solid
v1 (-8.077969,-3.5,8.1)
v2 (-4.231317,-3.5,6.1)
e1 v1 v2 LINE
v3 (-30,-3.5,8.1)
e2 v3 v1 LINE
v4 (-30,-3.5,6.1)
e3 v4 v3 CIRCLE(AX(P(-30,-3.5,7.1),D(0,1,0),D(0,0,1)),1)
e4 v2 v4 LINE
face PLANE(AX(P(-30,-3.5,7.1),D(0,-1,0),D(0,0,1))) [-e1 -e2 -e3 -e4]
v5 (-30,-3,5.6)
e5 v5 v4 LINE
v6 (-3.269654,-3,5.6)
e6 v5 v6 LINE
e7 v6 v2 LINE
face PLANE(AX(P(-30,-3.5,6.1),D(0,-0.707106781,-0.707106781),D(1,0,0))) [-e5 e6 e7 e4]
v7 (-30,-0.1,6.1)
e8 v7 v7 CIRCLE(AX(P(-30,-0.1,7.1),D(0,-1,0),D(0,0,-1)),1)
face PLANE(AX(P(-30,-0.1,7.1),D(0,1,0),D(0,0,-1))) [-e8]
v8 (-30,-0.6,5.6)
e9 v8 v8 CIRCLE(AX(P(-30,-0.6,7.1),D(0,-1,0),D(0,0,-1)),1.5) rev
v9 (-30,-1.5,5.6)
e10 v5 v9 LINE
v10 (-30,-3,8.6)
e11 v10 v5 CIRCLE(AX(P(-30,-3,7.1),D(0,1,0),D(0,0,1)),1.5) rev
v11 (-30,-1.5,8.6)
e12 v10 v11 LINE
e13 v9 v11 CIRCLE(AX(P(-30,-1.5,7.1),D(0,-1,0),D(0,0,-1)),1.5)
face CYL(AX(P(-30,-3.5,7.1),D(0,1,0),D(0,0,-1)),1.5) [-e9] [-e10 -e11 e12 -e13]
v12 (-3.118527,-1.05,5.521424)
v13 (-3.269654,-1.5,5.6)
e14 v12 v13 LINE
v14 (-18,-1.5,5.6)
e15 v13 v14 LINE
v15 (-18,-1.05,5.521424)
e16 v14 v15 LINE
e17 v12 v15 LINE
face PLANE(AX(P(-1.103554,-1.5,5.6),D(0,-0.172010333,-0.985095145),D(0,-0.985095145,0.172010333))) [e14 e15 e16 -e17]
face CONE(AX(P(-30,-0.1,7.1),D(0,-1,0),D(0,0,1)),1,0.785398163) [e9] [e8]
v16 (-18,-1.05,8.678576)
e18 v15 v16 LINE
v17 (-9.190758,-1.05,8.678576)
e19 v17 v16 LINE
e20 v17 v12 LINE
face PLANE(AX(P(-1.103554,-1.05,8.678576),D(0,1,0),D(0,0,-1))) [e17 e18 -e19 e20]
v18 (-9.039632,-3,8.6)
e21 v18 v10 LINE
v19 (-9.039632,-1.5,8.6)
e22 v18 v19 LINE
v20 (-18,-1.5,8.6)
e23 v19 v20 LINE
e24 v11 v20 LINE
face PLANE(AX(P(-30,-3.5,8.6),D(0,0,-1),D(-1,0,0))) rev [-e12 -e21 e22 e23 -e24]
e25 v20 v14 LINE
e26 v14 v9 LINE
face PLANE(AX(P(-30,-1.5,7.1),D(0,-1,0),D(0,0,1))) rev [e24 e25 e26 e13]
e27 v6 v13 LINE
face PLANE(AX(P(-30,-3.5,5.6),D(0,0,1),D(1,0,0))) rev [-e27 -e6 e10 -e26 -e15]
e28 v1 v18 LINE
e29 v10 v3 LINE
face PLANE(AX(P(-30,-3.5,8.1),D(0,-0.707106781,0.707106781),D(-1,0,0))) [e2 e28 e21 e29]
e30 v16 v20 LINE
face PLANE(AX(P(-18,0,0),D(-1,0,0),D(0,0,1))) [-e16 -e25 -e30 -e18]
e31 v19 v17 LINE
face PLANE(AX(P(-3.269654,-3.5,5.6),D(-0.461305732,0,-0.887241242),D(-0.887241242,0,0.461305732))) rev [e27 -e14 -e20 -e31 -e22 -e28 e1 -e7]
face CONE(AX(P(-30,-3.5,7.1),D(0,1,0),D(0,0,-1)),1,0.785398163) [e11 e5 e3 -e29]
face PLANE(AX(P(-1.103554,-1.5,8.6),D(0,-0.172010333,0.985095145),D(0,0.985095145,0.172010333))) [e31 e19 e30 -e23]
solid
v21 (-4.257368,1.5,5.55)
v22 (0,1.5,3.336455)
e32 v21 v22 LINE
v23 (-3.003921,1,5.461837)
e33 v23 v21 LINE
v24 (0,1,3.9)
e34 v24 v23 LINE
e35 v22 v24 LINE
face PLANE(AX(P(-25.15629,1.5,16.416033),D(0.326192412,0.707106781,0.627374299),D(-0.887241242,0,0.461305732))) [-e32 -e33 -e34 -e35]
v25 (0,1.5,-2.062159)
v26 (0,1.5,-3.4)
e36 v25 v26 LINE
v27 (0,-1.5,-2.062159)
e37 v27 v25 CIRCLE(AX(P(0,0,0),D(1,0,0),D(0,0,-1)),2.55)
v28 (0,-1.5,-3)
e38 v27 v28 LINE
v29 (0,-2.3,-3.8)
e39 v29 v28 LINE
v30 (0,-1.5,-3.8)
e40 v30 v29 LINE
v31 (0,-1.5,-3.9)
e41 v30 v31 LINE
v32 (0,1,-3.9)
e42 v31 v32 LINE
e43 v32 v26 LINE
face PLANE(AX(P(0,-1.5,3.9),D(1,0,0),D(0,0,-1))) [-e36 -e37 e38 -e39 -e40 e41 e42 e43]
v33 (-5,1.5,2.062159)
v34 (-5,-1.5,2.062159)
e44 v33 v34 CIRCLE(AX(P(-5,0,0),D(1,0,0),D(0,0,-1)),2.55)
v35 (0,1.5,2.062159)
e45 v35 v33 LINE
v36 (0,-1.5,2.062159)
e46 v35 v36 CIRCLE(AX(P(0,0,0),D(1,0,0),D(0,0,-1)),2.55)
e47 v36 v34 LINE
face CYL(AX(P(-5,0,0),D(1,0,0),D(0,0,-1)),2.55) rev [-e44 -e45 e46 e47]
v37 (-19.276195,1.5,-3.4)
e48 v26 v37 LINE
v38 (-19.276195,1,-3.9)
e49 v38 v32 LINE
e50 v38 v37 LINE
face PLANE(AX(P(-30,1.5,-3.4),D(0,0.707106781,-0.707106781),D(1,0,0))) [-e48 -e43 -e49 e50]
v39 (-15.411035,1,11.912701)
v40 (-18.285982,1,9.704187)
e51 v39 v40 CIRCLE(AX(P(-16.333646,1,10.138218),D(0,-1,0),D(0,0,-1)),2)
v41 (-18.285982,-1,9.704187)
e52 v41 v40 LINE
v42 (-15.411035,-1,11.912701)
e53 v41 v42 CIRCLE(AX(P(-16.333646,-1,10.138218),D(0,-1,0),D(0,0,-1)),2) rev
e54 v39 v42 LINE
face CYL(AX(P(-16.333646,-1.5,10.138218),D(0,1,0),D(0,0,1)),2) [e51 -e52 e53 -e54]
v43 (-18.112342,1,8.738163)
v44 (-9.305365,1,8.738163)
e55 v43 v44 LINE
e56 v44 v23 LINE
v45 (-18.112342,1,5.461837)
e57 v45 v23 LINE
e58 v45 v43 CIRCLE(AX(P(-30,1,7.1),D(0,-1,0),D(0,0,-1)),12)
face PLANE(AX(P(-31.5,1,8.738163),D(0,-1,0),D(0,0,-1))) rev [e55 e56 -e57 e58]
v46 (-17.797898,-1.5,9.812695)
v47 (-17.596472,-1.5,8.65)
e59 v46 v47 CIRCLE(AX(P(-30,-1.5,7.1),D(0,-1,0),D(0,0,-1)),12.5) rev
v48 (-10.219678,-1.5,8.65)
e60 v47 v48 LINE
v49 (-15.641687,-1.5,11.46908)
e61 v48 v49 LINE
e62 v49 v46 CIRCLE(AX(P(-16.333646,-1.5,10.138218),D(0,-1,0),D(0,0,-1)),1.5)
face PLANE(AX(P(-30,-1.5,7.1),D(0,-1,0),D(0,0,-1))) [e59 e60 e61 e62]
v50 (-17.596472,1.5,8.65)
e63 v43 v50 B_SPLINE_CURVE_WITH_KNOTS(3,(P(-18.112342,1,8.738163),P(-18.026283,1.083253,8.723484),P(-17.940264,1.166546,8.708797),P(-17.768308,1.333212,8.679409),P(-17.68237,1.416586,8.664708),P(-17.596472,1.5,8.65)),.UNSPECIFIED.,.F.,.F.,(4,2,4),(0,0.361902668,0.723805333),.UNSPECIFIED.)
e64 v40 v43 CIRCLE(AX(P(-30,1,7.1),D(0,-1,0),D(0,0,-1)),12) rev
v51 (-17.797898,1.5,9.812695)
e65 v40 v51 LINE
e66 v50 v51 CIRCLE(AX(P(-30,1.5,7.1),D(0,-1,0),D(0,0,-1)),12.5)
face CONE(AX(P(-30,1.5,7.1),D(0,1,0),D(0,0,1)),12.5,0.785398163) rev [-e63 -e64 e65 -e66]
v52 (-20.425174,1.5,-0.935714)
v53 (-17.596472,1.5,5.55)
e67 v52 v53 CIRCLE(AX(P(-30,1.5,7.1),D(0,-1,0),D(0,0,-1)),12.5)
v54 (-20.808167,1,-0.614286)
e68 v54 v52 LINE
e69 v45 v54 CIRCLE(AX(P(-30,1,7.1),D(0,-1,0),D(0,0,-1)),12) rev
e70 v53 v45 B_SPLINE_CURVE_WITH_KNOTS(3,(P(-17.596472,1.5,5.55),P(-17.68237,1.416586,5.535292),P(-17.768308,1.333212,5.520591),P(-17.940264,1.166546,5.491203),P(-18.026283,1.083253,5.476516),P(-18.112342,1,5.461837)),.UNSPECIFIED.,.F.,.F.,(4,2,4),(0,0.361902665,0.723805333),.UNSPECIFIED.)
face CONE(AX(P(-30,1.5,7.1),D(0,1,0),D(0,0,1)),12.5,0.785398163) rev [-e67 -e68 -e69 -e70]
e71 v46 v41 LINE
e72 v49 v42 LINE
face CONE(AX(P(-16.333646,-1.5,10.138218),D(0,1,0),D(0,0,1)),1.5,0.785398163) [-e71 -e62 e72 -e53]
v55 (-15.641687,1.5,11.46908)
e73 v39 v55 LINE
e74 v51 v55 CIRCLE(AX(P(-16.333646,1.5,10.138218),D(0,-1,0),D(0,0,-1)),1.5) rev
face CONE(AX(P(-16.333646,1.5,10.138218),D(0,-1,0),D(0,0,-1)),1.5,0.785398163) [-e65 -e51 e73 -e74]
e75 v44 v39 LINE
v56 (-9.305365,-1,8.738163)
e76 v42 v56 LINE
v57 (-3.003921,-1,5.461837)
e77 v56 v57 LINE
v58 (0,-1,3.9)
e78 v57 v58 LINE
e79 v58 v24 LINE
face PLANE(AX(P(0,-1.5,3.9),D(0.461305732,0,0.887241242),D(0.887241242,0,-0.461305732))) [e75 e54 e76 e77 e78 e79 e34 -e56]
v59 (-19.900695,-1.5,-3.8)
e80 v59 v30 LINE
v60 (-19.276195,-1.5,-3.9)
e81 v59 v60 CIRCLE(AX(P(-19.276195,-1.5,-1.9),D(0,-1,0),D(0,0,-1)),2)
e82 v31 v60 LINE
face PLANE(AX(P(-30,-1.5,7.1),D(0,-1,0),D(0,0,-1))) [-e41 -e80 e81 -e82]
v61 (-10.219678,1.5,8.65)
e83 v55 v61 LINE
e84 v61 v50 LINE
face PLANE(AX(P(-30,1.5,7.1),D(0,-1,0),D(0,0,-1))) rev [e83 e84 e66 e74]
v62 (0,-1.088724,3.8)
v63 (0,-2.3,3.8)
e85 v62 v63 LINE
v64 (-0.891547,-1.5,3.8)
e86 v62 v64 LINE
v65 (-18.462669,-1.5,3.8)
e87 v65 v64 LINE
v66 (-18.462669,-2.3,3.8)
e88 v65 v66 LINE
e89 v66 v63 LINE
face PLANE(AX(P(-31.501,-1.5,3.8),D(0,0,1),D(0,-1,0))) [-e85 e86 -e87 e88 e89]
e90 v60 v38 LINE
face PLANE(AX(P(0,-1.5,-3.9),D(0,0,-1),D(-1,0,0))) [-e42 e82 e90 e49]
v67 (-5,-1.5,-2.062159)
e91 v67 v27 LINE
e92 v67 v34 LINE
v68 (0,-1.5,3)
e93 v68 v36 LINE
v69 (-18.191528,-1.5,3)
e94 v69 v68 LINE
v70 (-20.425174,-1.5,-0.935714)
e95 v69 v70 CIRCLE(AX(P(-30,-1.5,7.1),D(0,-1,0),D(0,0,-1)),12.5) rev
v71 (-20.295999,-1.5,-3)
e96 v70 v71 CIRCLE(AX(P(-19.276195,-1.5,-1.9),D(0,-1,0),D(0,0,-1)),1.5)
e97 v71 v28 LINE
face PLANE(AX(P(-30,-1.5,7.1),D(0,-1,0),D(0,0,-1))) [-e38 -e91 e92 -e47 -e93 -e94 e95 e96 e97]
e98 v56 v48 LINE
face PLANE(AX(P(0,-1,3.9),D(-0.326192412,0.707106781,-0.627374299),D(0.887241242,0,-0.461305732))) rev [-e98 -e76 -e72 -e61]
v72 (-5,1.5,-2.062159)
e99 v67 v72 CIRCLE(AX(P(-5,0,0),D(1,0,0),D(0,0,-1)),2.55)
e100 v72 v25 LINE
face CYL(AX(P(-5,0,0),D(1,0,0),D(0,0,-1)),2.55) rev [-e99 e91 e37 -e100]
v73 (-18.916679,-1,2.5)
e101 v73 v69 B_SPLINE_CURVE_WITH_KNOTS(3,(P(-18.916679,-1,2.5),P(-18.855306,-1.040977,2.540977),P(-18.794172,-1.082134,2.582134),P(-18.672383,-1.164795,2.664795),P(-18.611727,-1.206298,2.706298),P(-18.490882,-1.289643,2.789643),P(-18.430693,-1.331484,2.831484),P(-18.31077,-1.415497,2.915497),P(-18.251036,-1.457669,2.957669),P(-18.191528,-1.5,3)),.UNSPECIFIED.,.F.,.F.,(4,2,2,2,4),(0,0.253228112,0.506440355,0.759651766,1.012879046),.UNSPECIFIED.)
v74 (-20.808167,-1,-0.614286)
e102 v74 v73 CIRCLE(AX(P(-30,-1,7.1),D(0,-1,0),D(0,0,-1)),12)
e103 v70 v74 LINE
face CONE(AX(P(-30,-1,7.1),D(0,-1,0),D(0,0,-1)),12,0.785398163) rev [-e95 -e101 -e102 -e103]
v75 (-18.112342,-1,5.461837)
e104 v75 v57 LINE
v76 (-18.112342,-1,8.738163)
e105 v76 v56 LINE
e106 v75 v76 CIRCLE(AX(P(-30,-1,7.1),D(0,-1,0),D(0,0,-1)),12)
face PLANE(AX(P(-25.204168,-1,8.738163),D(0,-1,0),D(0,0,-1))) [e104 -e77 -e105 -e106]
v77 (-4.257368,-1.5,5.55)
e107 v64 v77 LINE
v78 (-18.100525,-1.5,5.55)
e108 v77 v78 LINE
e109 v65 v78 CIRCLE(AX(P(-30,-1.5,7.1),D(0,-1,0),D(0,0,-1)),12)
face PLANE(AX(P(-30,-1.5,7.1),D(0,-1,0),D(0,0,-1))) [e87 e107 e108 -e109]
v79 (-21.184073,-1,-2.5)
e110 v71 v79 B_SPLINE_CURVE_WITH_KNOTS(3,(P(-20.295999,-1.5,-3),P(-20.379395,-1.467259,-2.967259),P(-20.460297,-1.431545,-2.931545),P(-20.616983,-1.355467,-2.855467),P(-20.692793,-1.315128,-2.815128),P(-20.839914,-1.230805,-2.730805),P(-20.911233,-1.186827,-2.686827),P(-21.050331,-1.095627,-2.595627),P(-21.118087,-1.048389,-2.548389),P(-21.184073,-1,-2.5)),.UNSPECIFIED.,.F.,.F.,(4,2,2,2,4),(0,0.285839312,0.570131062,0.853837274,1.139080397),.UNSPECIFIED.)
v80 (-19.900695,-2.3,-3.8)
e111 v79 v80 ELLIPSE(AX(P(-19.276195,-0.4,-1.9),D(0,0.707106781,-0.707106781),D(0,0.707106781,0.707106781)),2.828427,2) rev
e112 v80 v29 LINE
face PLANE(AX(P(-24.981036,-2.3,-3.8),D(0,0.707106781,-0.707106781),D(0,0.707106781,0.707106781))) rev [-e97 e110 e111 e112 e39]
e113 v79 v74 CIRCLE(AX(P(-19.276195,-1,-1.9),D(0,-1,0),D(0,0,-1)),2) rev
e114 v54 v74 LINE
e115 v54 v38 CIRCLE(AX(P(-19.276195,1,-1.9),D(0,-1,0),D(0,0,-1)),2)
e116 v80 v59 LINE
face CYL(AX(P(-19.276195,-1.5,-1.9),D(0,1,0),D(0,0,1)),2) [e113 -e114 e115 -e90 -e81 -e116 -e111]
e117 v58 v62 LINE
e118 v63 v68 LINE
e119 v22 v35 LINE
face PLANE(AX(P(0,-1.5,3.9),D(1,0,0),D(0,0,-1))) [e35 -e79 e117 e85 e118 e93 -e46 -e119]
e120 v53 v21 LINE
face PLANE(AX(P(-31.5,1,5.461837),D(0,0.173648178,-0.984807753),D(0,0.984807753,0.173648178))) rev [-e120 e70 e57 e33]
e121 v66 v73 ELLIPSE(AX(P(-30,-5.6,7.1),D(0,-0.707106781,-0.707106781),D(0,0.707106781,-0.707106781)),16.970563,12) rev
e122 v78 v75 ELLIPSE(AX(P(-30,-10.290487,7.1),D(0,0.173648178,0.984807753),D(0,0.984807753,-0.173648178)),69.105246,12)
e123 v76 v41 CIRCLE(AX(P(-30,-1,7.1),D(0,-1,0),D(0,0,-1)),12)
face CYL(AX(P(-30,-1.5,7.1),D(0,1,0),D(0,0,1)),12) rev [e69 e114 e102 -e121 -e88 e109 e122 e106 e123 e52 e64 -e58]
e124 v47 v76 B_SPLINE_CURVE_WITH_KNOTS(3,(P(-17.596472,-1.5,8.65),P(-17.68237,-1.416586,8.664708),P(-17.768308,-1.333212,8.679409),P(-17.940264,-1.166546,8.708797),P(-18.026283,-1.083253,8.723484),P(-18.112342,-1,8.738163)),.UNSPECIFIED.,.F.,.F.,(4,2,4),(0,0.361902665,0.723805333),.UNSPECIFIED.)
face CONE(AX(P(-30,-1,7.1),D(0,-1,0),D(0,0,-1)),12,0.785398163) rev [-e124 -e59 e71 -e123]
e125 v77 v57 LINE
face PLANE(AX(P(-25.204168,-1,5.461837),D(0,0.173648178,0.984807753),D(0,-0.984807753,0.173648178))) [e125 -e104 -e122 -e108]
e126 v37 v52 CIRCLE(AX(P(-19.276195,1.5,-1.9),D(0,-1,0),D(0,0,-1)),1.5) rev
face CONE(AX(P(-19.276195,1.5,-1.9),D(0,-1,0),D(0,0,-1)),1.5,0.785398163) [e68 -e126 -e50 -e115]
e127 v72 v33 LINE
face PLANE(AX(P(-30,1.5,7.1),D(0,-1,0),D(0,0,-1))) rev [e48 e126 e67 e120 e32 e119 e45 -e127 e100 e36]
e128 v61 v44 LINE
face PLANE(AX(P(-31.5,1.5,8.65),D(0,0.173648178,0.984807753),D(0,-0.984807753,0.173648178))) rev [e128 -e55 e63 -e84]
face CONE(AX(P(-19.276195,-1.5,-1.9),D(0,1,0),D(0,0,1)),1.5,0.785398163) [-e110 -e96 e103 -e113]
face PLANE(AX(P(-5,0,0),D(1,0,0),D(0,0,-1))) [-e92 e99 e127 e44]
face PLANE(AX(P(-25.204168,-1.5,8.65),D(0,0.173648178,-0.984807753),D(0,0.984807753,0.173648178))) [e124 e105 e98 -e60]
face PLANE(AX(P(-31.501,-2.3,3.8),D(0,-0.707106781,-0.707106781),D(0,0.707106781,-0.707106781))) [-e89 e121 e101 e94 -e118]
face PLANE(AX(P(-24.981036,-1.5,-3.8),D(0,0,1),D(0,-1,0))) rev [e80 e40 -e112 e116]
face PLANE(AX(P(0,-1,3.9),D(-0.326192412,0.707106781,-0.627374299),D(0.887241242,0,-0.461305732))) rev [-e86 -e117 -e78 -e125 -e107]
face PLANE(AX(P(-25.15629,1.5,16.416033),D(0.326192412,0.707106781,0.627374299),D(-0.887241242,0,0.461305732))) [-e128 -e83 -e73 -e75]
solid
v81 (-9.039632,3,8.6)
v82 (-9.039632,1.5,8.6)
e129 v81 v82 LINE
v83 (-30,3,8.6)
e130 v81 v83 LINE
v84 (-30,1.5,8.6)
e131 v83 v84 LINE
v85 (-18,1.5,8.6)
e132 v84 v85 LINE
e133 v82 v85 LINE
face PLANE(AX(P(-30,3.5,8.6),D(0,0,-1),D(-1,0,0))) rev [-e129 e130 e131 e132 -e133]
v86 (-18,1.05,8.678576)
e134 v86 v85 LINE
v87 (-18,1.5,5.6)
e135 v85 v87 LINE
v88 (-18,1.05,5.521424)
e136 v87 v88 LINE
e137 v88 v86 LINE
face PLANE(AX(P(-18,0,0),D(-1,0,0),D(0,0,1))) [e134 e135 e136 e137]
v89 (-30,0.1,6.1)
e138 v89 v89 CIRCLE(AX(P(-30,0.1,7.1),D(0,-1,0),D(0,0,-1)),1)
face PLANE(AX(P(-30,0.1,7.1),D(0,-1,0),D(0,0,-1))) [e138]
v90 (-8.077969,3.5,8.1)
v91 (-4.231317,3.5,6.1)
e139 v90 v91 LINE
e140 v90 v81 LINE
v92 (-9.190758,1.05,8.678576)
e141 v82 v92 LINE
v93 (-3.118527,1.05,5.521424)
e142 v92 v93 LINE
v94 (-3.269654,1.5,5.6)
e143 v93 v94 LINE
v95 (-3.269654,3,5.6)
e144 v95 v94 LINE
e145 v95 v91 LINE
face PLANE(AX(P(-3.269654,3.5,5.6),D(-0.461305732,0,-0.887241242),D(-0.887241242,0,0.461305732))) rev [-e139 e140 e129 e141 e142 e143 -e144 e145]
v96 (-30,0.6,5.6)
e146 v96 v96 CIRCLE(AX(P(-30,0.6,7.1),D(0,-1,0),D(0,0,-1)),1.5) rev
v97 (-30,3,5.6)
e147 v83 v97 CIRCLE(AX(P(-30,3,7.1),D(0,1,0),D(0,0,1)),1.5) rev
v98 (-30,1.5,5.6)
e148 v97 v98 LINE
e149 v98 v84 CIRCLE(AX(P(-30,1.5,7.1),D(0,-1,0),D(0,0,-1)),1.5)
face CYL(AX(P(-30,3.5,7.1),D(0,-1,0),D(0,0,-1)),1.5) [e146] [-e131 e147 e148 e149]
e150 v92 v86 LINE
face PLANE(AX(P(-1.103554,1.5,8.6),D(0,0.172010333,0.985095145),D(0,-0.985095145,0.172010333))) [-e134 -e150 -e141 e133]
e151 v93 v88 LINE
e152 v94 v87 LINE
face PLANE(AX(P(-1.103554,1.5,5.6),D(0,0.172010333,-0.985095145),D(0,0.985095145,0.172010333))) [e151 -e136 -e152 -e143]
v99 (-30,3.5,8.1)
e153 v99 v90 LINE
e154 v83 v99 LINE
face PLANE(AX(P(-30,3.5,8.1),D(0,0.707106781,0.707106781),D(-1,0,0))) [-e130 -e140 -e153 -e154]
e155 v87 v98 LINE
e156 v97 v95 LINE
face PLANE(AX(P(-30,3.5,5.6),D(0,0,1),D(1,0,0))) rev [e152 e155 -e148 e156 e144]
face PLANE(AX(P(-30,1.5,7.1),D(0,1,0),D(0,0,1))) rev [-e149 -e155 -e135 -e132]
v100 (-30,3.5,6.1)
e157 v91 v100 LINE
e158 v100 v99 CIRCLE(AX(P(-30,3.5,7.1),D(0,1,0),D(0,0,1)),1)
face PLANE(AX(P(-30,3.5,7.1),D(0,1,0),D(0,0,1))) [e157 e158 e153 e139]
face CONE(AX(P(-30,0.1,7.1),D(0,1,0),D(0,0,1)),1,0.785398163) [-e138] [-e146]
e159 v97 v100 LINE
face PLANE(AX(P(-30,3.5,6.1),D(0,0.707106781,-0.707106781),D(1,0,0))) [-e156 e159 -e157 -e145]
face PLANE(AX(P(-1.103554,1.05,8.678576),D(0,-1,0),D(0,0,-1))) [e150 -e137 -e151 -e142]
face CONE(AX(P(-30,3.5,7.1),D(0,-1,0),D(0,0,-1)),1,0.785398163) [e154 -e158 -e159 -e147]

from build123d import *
from build123d.topology import SkipClean

# Parameters (mm, degrees)
BOSS_EXTRUDE1_DEPTH      = 1.5
SKETCH3_R                = 2.5500000000000003
CUT_EXTRUDE1_DEPTH       = 5
BOSS_EXTRUDE2_DEPTH      = 2
CUT_EXTRUDE2_DEPTH       = 35.91480579173508
BOSS_EXTRUDE4_REACH      = 25.469
SKETCH8_R                = 1.499999999999997
BOSS_EXTRUDE5_DEPTH      = 1.4
FILLET1_R                = 2
BOSS_EXTRUDE6_REACH      = 35.939
BOSS_EXTRUDE6_END_RADIUS = 12
MIRROR2_START            = -24.981035963
MIRROR2_DEPTH            = 24.981035963
MIRROR2_START_2          = -3
MIRROR2_2_DEPTH          = 1.5
CUT_EXTRUDE4_DEPTH       = 35.12603615991723
CHAMFER2_SIZE            = 0.5
CHAMFER1_SIZE            = 0.5


with BuildPart() as part:
    # Sketch2 → Boss-Extrude1 (new, symmetric)
    with BuildSketch(Plane(origin=(0, 0, 0), x_dir=(1, 0, 0), z_dir=(0, 1, 0))):
        with BuildLine():
            Line((0, -3.9000000000000075), (0, 3.899999999999993))
            Line((0, 3.899999999999993), (-25.204168476687265, 3.899999999999991))
            ThreePointArc((-25.204168476687265, 3.899999999999991), (-18.343183564475204, -4.250678924992998), (-20.67057742658785, -14.647309086469686))
            Line((-20.67057742658785, -14.647309086469686), (0, -3.9000000000000075))
        make_face()
    extrude(amount=BOSS_EXTRUDE1_DEPTH, both=True)

    # Sketch3 → Cut-Extrude1 (cut)
    with BuildSketch(Plane(origin=(0, 0, 0), x_dir=(0, 0, -1), z_dir=(1, 0, 0))):
        Circle(SKETCH3_R)
    extrude(amount=-CUT_EXTRUDE1_DEPTH, mode=Mode.SUBTRACT)

    # Sketch5 → Cut-Extrude2 (cut, through all)
    with BuildSketch(Plane(origin=(0, 0, 0), x_dir=(0, 0, -1), z_dir=(1, 0, 0))):
        Polygon((-8.650000000000004, 1.5), (-8.73816349035424, 0.9999999999999993), (-5.461836509645769, 0.9999999999999993), (-5.550000000000004, 1.5), align=None)
    cut_extrude2 = extrude(amount=-CUT_EXTRUDE2_DEPTH, mode=Mode.SUBTRACT)

    # Mirror1: Cut-Extrude2 across plane
    add(cut_extrude2.mirror(Plane.ZX), mode=Mode.SUBTRACT)

    # Fillet1
    fillet1_edges = [part.edges().sort_by_distance(p)[0] for p in [
        (-20.67057742658785, 0, 14.647309086469686),
        (-25.204168476687265, 0, -3.8999999999999906),
    ]]
    fillet(fillet1_edges, radius=FILLET1_R)

    # Boss-Extrude6: up to this cylinder (the profile starts outside it)
    boss_extrude6_end = Plane(origin=(-30, -1.766667, 7.100000000000005), z_dir=(0, 1, 0)) * Cylinder(BOSS_EXTRUDE6_END_RADIUS, 96.878, mode=Mode.PRIVATE)
    # Sketch9 → Boss-Extrude6 (add, up to the surface)
    with BuildSketch(Plane(origin=(0, 0, 0), x_dir=(0, 0, -1), z_dir=(1, 0, 0)), mode=Mode.PRIVATE) as boss_extrude6_sk1:
        Polygon((-3.7999999999999994, -1.5), (-3.8, -2.3), (-3, -1.5), align=None)
    boss_extrude6_tool1 = extrude(boss_extrude6_sk1.sketch, amount=-BOSS_EXTRUDE6_REACH, mode=Mode.PRIVATE) - boss_extrude6_end
    add(boss_extrude6_tool1.solids().sort_by_distance((0, -1.766667, 3.533333))[0])

    # Mirror2: read off the stored shape, not the designer's step
    # Mirror2 outline → Mirror2 (add)
    with BuildSketch(Plane.YZ.offset(MIRROR2_START)):
        Polygon((-1.5, -3.8), (-1.5, -3), (-2.3, -3.8), align=None)
    extrude(amount=MIRROR2_DEPTH)

    # Mirror2 2 outline → Mirror2 2 (cut)
    with BuildSketch(Plane(origin=(0, 0, 0), x_dir=(1, 0, 0), z_dir=(0, 1, 0)).offset(MIRROR2_START_2)):
        with BuildLine():
            Line((-22, 2.024776923), (-23.520030864, 3))
            ThreePointArc((-23.520030864, 3), (-24.236635876, 3.425380467), (-24.981035963, 3.8))
            Line((-24.981035963, 3.8), (-24.981035963, 1))
            Line((-24.981035963, 1), (-22, 1))
            Line((-22, 1), (-22, 2.024776923))
        make_face()
    extrude(amount=MIRROR2_2_DEPTH, mode=Mode.SUBTRACT)

    # Sketch10 → Cut-Extrude4 (cut, through all)
    with BuildSketch(Plane(origin=(0, -1.5, 0), x_dir=(1, 0, 0), z_dir=(0, 1, 0))):
        with BuildLine():
            Line((-19.900694505076203, 3.799999999999999), (-24.98103596346817, 3.8000000000000003))
            ThreePointArc((-24.98103596346817, 3.8000000000000003), (-24.2366358760677, 3.4253804669935803), (-23.520030864271043, 3))
            Line((-23.520030864271043, 3), (-20.946524014085387, 3))
            ThreePointArc((-20.946524014085387, 3), (-20.491332623137634, 3.488533865071372), (-19.900694505076203, 3.799999999999999))
        make_face()
    extrude(amount=-CUT_EXTRUDE4_DEPTH, mode=Mode.SUBTRACT)

    # Chamfer1
    chamfer1_edges = [part.edges().sort_by_distance(p)[0] for p in [
        (-1.5867438295232468, 1.5, 4.725000000000003),
        (-9.638097352618193, 1.5, -3.899999999999992),
        (-21.088848639586317, 1.5, -2.745154254728507),
        (-19.01317053469328, 1.5, 2.2740722860502682),
        (-18.181494014390573, 1.5, 9.17916239580129),
        (-17.552032906206957, 1.5, 11.724261681549507),
        (-12.27341621121789, 1.5, 10.281350401908949),
        (-21.27283986088827, -1.5, -1.784206552811166),
        (-19.606839169271502, -1.5, 1.1014828543538435),
        (-1.5867438295232468, -1.5, 4.725000000000003),
        (-18.181494014390573, -1.5, 9.17916239580129),
        (-17.552032906206957, -1.5, 11.724261681549507),
        (-12.27341621121789, -1.5, 10.281350401908949),
    ]]
    chamfer(chamfer1_edges, length=CHAMFER1_SIZE)


with BuildPart() as body_2:
    # Sketch4 → Boss-Extrude2 (new body)
    with BuildSketch(Plane(origin=(0, 1.5, 0), x_dir=(1, 0, 0), z_dir=(0, 1, 0))):
        with BuildLine():
            Line((-30, -5.600000000000004), (-3.2696539517448784, -5.600000000000004))
            Line((-3.2696539517448784, -5.600000000000004), (-9.039631513647626, -8.600000000000003))
            Line((-9.039631513647626, -8.600000000000003), (-30, -8.600000000000003))
            ThreePointArc((-30, -8.600000000000003), (-31.5, -7.100000000000005), (-30, -5.600000000000004))
        make_face()
    extrude(amount=BOSS_EXTRUDE2_DEPTH)

    # Boss-Extrude4: up to this plane
    boss_extrude4_end = Plane(origin=(-3.2696539517448784, 3.5, 5.600000000000004), z_dir=(-0.46130573246151213, 0, -0.8872412418266792))
    # Sketch6 → Boss-Extrude4 (add, up to the surface)
    with BuildSketch(Plane.ZY.offset(18), mode=Mode.PRIVATE) as boss_extrude4_sk1:
        Polygon((5.600000000000004, 1.5), (5.52142418927548, 1.0499999999999996), (8.678575810724528, 1.0499999999999994), (8.600000000000003, 1.5), align=None)
    boss_extrude4_tool1 = split(extrude(boss_extrude4_sk1.sketch, amount=-BOSS_EXTRUDE4_REACH, mode=Mode.PRIVATE), bisect_by=boss_extrude4_end, keep=Keep.BOTH, mode=Mode.PRIVATE)
    add(boss_extrude4_tool1.solids().sort_by_distance((-18, 1.273086, 7.1))[0])

    # Sketch8 → Boss-Extrude5 (add)
    with SkipClean():  # the faces are left unmerged after this step: merging them gives an invalid solid
        with BuildSketch(Plane.XZ.offset(-1.5)):
            with Locations(Location((-30, 7.100000000000005, 0), (0, 0, 270))):
                Circle(SKETCH8_R)
        extrude(amount=BOSS_EXTRUDE5_DEPTH)

    # Chamfer2
    chamfer2_edges = [body_2.edges().sort_by_distance(p)[0] for p in [
        (-16.63482697587244, 3.5, 5.600000000000004),
        (-30, 0.10000000000000009, 8.600000000000001),
        (-31.5, 3.5, 7.100000000000003),
        (-19.51981575682381, 3.5, 8.600000000000003),
    ]]
    chamfer(chamfer2_edges, length=CHAMFER2_SIZE)


with BuildPart() as body_3:
    # Mirror3: mirrored copy
    add(body_2.part.mirror(Plane.ZX))


solid = Compound([part.part, body_2.part, body_3.part])
